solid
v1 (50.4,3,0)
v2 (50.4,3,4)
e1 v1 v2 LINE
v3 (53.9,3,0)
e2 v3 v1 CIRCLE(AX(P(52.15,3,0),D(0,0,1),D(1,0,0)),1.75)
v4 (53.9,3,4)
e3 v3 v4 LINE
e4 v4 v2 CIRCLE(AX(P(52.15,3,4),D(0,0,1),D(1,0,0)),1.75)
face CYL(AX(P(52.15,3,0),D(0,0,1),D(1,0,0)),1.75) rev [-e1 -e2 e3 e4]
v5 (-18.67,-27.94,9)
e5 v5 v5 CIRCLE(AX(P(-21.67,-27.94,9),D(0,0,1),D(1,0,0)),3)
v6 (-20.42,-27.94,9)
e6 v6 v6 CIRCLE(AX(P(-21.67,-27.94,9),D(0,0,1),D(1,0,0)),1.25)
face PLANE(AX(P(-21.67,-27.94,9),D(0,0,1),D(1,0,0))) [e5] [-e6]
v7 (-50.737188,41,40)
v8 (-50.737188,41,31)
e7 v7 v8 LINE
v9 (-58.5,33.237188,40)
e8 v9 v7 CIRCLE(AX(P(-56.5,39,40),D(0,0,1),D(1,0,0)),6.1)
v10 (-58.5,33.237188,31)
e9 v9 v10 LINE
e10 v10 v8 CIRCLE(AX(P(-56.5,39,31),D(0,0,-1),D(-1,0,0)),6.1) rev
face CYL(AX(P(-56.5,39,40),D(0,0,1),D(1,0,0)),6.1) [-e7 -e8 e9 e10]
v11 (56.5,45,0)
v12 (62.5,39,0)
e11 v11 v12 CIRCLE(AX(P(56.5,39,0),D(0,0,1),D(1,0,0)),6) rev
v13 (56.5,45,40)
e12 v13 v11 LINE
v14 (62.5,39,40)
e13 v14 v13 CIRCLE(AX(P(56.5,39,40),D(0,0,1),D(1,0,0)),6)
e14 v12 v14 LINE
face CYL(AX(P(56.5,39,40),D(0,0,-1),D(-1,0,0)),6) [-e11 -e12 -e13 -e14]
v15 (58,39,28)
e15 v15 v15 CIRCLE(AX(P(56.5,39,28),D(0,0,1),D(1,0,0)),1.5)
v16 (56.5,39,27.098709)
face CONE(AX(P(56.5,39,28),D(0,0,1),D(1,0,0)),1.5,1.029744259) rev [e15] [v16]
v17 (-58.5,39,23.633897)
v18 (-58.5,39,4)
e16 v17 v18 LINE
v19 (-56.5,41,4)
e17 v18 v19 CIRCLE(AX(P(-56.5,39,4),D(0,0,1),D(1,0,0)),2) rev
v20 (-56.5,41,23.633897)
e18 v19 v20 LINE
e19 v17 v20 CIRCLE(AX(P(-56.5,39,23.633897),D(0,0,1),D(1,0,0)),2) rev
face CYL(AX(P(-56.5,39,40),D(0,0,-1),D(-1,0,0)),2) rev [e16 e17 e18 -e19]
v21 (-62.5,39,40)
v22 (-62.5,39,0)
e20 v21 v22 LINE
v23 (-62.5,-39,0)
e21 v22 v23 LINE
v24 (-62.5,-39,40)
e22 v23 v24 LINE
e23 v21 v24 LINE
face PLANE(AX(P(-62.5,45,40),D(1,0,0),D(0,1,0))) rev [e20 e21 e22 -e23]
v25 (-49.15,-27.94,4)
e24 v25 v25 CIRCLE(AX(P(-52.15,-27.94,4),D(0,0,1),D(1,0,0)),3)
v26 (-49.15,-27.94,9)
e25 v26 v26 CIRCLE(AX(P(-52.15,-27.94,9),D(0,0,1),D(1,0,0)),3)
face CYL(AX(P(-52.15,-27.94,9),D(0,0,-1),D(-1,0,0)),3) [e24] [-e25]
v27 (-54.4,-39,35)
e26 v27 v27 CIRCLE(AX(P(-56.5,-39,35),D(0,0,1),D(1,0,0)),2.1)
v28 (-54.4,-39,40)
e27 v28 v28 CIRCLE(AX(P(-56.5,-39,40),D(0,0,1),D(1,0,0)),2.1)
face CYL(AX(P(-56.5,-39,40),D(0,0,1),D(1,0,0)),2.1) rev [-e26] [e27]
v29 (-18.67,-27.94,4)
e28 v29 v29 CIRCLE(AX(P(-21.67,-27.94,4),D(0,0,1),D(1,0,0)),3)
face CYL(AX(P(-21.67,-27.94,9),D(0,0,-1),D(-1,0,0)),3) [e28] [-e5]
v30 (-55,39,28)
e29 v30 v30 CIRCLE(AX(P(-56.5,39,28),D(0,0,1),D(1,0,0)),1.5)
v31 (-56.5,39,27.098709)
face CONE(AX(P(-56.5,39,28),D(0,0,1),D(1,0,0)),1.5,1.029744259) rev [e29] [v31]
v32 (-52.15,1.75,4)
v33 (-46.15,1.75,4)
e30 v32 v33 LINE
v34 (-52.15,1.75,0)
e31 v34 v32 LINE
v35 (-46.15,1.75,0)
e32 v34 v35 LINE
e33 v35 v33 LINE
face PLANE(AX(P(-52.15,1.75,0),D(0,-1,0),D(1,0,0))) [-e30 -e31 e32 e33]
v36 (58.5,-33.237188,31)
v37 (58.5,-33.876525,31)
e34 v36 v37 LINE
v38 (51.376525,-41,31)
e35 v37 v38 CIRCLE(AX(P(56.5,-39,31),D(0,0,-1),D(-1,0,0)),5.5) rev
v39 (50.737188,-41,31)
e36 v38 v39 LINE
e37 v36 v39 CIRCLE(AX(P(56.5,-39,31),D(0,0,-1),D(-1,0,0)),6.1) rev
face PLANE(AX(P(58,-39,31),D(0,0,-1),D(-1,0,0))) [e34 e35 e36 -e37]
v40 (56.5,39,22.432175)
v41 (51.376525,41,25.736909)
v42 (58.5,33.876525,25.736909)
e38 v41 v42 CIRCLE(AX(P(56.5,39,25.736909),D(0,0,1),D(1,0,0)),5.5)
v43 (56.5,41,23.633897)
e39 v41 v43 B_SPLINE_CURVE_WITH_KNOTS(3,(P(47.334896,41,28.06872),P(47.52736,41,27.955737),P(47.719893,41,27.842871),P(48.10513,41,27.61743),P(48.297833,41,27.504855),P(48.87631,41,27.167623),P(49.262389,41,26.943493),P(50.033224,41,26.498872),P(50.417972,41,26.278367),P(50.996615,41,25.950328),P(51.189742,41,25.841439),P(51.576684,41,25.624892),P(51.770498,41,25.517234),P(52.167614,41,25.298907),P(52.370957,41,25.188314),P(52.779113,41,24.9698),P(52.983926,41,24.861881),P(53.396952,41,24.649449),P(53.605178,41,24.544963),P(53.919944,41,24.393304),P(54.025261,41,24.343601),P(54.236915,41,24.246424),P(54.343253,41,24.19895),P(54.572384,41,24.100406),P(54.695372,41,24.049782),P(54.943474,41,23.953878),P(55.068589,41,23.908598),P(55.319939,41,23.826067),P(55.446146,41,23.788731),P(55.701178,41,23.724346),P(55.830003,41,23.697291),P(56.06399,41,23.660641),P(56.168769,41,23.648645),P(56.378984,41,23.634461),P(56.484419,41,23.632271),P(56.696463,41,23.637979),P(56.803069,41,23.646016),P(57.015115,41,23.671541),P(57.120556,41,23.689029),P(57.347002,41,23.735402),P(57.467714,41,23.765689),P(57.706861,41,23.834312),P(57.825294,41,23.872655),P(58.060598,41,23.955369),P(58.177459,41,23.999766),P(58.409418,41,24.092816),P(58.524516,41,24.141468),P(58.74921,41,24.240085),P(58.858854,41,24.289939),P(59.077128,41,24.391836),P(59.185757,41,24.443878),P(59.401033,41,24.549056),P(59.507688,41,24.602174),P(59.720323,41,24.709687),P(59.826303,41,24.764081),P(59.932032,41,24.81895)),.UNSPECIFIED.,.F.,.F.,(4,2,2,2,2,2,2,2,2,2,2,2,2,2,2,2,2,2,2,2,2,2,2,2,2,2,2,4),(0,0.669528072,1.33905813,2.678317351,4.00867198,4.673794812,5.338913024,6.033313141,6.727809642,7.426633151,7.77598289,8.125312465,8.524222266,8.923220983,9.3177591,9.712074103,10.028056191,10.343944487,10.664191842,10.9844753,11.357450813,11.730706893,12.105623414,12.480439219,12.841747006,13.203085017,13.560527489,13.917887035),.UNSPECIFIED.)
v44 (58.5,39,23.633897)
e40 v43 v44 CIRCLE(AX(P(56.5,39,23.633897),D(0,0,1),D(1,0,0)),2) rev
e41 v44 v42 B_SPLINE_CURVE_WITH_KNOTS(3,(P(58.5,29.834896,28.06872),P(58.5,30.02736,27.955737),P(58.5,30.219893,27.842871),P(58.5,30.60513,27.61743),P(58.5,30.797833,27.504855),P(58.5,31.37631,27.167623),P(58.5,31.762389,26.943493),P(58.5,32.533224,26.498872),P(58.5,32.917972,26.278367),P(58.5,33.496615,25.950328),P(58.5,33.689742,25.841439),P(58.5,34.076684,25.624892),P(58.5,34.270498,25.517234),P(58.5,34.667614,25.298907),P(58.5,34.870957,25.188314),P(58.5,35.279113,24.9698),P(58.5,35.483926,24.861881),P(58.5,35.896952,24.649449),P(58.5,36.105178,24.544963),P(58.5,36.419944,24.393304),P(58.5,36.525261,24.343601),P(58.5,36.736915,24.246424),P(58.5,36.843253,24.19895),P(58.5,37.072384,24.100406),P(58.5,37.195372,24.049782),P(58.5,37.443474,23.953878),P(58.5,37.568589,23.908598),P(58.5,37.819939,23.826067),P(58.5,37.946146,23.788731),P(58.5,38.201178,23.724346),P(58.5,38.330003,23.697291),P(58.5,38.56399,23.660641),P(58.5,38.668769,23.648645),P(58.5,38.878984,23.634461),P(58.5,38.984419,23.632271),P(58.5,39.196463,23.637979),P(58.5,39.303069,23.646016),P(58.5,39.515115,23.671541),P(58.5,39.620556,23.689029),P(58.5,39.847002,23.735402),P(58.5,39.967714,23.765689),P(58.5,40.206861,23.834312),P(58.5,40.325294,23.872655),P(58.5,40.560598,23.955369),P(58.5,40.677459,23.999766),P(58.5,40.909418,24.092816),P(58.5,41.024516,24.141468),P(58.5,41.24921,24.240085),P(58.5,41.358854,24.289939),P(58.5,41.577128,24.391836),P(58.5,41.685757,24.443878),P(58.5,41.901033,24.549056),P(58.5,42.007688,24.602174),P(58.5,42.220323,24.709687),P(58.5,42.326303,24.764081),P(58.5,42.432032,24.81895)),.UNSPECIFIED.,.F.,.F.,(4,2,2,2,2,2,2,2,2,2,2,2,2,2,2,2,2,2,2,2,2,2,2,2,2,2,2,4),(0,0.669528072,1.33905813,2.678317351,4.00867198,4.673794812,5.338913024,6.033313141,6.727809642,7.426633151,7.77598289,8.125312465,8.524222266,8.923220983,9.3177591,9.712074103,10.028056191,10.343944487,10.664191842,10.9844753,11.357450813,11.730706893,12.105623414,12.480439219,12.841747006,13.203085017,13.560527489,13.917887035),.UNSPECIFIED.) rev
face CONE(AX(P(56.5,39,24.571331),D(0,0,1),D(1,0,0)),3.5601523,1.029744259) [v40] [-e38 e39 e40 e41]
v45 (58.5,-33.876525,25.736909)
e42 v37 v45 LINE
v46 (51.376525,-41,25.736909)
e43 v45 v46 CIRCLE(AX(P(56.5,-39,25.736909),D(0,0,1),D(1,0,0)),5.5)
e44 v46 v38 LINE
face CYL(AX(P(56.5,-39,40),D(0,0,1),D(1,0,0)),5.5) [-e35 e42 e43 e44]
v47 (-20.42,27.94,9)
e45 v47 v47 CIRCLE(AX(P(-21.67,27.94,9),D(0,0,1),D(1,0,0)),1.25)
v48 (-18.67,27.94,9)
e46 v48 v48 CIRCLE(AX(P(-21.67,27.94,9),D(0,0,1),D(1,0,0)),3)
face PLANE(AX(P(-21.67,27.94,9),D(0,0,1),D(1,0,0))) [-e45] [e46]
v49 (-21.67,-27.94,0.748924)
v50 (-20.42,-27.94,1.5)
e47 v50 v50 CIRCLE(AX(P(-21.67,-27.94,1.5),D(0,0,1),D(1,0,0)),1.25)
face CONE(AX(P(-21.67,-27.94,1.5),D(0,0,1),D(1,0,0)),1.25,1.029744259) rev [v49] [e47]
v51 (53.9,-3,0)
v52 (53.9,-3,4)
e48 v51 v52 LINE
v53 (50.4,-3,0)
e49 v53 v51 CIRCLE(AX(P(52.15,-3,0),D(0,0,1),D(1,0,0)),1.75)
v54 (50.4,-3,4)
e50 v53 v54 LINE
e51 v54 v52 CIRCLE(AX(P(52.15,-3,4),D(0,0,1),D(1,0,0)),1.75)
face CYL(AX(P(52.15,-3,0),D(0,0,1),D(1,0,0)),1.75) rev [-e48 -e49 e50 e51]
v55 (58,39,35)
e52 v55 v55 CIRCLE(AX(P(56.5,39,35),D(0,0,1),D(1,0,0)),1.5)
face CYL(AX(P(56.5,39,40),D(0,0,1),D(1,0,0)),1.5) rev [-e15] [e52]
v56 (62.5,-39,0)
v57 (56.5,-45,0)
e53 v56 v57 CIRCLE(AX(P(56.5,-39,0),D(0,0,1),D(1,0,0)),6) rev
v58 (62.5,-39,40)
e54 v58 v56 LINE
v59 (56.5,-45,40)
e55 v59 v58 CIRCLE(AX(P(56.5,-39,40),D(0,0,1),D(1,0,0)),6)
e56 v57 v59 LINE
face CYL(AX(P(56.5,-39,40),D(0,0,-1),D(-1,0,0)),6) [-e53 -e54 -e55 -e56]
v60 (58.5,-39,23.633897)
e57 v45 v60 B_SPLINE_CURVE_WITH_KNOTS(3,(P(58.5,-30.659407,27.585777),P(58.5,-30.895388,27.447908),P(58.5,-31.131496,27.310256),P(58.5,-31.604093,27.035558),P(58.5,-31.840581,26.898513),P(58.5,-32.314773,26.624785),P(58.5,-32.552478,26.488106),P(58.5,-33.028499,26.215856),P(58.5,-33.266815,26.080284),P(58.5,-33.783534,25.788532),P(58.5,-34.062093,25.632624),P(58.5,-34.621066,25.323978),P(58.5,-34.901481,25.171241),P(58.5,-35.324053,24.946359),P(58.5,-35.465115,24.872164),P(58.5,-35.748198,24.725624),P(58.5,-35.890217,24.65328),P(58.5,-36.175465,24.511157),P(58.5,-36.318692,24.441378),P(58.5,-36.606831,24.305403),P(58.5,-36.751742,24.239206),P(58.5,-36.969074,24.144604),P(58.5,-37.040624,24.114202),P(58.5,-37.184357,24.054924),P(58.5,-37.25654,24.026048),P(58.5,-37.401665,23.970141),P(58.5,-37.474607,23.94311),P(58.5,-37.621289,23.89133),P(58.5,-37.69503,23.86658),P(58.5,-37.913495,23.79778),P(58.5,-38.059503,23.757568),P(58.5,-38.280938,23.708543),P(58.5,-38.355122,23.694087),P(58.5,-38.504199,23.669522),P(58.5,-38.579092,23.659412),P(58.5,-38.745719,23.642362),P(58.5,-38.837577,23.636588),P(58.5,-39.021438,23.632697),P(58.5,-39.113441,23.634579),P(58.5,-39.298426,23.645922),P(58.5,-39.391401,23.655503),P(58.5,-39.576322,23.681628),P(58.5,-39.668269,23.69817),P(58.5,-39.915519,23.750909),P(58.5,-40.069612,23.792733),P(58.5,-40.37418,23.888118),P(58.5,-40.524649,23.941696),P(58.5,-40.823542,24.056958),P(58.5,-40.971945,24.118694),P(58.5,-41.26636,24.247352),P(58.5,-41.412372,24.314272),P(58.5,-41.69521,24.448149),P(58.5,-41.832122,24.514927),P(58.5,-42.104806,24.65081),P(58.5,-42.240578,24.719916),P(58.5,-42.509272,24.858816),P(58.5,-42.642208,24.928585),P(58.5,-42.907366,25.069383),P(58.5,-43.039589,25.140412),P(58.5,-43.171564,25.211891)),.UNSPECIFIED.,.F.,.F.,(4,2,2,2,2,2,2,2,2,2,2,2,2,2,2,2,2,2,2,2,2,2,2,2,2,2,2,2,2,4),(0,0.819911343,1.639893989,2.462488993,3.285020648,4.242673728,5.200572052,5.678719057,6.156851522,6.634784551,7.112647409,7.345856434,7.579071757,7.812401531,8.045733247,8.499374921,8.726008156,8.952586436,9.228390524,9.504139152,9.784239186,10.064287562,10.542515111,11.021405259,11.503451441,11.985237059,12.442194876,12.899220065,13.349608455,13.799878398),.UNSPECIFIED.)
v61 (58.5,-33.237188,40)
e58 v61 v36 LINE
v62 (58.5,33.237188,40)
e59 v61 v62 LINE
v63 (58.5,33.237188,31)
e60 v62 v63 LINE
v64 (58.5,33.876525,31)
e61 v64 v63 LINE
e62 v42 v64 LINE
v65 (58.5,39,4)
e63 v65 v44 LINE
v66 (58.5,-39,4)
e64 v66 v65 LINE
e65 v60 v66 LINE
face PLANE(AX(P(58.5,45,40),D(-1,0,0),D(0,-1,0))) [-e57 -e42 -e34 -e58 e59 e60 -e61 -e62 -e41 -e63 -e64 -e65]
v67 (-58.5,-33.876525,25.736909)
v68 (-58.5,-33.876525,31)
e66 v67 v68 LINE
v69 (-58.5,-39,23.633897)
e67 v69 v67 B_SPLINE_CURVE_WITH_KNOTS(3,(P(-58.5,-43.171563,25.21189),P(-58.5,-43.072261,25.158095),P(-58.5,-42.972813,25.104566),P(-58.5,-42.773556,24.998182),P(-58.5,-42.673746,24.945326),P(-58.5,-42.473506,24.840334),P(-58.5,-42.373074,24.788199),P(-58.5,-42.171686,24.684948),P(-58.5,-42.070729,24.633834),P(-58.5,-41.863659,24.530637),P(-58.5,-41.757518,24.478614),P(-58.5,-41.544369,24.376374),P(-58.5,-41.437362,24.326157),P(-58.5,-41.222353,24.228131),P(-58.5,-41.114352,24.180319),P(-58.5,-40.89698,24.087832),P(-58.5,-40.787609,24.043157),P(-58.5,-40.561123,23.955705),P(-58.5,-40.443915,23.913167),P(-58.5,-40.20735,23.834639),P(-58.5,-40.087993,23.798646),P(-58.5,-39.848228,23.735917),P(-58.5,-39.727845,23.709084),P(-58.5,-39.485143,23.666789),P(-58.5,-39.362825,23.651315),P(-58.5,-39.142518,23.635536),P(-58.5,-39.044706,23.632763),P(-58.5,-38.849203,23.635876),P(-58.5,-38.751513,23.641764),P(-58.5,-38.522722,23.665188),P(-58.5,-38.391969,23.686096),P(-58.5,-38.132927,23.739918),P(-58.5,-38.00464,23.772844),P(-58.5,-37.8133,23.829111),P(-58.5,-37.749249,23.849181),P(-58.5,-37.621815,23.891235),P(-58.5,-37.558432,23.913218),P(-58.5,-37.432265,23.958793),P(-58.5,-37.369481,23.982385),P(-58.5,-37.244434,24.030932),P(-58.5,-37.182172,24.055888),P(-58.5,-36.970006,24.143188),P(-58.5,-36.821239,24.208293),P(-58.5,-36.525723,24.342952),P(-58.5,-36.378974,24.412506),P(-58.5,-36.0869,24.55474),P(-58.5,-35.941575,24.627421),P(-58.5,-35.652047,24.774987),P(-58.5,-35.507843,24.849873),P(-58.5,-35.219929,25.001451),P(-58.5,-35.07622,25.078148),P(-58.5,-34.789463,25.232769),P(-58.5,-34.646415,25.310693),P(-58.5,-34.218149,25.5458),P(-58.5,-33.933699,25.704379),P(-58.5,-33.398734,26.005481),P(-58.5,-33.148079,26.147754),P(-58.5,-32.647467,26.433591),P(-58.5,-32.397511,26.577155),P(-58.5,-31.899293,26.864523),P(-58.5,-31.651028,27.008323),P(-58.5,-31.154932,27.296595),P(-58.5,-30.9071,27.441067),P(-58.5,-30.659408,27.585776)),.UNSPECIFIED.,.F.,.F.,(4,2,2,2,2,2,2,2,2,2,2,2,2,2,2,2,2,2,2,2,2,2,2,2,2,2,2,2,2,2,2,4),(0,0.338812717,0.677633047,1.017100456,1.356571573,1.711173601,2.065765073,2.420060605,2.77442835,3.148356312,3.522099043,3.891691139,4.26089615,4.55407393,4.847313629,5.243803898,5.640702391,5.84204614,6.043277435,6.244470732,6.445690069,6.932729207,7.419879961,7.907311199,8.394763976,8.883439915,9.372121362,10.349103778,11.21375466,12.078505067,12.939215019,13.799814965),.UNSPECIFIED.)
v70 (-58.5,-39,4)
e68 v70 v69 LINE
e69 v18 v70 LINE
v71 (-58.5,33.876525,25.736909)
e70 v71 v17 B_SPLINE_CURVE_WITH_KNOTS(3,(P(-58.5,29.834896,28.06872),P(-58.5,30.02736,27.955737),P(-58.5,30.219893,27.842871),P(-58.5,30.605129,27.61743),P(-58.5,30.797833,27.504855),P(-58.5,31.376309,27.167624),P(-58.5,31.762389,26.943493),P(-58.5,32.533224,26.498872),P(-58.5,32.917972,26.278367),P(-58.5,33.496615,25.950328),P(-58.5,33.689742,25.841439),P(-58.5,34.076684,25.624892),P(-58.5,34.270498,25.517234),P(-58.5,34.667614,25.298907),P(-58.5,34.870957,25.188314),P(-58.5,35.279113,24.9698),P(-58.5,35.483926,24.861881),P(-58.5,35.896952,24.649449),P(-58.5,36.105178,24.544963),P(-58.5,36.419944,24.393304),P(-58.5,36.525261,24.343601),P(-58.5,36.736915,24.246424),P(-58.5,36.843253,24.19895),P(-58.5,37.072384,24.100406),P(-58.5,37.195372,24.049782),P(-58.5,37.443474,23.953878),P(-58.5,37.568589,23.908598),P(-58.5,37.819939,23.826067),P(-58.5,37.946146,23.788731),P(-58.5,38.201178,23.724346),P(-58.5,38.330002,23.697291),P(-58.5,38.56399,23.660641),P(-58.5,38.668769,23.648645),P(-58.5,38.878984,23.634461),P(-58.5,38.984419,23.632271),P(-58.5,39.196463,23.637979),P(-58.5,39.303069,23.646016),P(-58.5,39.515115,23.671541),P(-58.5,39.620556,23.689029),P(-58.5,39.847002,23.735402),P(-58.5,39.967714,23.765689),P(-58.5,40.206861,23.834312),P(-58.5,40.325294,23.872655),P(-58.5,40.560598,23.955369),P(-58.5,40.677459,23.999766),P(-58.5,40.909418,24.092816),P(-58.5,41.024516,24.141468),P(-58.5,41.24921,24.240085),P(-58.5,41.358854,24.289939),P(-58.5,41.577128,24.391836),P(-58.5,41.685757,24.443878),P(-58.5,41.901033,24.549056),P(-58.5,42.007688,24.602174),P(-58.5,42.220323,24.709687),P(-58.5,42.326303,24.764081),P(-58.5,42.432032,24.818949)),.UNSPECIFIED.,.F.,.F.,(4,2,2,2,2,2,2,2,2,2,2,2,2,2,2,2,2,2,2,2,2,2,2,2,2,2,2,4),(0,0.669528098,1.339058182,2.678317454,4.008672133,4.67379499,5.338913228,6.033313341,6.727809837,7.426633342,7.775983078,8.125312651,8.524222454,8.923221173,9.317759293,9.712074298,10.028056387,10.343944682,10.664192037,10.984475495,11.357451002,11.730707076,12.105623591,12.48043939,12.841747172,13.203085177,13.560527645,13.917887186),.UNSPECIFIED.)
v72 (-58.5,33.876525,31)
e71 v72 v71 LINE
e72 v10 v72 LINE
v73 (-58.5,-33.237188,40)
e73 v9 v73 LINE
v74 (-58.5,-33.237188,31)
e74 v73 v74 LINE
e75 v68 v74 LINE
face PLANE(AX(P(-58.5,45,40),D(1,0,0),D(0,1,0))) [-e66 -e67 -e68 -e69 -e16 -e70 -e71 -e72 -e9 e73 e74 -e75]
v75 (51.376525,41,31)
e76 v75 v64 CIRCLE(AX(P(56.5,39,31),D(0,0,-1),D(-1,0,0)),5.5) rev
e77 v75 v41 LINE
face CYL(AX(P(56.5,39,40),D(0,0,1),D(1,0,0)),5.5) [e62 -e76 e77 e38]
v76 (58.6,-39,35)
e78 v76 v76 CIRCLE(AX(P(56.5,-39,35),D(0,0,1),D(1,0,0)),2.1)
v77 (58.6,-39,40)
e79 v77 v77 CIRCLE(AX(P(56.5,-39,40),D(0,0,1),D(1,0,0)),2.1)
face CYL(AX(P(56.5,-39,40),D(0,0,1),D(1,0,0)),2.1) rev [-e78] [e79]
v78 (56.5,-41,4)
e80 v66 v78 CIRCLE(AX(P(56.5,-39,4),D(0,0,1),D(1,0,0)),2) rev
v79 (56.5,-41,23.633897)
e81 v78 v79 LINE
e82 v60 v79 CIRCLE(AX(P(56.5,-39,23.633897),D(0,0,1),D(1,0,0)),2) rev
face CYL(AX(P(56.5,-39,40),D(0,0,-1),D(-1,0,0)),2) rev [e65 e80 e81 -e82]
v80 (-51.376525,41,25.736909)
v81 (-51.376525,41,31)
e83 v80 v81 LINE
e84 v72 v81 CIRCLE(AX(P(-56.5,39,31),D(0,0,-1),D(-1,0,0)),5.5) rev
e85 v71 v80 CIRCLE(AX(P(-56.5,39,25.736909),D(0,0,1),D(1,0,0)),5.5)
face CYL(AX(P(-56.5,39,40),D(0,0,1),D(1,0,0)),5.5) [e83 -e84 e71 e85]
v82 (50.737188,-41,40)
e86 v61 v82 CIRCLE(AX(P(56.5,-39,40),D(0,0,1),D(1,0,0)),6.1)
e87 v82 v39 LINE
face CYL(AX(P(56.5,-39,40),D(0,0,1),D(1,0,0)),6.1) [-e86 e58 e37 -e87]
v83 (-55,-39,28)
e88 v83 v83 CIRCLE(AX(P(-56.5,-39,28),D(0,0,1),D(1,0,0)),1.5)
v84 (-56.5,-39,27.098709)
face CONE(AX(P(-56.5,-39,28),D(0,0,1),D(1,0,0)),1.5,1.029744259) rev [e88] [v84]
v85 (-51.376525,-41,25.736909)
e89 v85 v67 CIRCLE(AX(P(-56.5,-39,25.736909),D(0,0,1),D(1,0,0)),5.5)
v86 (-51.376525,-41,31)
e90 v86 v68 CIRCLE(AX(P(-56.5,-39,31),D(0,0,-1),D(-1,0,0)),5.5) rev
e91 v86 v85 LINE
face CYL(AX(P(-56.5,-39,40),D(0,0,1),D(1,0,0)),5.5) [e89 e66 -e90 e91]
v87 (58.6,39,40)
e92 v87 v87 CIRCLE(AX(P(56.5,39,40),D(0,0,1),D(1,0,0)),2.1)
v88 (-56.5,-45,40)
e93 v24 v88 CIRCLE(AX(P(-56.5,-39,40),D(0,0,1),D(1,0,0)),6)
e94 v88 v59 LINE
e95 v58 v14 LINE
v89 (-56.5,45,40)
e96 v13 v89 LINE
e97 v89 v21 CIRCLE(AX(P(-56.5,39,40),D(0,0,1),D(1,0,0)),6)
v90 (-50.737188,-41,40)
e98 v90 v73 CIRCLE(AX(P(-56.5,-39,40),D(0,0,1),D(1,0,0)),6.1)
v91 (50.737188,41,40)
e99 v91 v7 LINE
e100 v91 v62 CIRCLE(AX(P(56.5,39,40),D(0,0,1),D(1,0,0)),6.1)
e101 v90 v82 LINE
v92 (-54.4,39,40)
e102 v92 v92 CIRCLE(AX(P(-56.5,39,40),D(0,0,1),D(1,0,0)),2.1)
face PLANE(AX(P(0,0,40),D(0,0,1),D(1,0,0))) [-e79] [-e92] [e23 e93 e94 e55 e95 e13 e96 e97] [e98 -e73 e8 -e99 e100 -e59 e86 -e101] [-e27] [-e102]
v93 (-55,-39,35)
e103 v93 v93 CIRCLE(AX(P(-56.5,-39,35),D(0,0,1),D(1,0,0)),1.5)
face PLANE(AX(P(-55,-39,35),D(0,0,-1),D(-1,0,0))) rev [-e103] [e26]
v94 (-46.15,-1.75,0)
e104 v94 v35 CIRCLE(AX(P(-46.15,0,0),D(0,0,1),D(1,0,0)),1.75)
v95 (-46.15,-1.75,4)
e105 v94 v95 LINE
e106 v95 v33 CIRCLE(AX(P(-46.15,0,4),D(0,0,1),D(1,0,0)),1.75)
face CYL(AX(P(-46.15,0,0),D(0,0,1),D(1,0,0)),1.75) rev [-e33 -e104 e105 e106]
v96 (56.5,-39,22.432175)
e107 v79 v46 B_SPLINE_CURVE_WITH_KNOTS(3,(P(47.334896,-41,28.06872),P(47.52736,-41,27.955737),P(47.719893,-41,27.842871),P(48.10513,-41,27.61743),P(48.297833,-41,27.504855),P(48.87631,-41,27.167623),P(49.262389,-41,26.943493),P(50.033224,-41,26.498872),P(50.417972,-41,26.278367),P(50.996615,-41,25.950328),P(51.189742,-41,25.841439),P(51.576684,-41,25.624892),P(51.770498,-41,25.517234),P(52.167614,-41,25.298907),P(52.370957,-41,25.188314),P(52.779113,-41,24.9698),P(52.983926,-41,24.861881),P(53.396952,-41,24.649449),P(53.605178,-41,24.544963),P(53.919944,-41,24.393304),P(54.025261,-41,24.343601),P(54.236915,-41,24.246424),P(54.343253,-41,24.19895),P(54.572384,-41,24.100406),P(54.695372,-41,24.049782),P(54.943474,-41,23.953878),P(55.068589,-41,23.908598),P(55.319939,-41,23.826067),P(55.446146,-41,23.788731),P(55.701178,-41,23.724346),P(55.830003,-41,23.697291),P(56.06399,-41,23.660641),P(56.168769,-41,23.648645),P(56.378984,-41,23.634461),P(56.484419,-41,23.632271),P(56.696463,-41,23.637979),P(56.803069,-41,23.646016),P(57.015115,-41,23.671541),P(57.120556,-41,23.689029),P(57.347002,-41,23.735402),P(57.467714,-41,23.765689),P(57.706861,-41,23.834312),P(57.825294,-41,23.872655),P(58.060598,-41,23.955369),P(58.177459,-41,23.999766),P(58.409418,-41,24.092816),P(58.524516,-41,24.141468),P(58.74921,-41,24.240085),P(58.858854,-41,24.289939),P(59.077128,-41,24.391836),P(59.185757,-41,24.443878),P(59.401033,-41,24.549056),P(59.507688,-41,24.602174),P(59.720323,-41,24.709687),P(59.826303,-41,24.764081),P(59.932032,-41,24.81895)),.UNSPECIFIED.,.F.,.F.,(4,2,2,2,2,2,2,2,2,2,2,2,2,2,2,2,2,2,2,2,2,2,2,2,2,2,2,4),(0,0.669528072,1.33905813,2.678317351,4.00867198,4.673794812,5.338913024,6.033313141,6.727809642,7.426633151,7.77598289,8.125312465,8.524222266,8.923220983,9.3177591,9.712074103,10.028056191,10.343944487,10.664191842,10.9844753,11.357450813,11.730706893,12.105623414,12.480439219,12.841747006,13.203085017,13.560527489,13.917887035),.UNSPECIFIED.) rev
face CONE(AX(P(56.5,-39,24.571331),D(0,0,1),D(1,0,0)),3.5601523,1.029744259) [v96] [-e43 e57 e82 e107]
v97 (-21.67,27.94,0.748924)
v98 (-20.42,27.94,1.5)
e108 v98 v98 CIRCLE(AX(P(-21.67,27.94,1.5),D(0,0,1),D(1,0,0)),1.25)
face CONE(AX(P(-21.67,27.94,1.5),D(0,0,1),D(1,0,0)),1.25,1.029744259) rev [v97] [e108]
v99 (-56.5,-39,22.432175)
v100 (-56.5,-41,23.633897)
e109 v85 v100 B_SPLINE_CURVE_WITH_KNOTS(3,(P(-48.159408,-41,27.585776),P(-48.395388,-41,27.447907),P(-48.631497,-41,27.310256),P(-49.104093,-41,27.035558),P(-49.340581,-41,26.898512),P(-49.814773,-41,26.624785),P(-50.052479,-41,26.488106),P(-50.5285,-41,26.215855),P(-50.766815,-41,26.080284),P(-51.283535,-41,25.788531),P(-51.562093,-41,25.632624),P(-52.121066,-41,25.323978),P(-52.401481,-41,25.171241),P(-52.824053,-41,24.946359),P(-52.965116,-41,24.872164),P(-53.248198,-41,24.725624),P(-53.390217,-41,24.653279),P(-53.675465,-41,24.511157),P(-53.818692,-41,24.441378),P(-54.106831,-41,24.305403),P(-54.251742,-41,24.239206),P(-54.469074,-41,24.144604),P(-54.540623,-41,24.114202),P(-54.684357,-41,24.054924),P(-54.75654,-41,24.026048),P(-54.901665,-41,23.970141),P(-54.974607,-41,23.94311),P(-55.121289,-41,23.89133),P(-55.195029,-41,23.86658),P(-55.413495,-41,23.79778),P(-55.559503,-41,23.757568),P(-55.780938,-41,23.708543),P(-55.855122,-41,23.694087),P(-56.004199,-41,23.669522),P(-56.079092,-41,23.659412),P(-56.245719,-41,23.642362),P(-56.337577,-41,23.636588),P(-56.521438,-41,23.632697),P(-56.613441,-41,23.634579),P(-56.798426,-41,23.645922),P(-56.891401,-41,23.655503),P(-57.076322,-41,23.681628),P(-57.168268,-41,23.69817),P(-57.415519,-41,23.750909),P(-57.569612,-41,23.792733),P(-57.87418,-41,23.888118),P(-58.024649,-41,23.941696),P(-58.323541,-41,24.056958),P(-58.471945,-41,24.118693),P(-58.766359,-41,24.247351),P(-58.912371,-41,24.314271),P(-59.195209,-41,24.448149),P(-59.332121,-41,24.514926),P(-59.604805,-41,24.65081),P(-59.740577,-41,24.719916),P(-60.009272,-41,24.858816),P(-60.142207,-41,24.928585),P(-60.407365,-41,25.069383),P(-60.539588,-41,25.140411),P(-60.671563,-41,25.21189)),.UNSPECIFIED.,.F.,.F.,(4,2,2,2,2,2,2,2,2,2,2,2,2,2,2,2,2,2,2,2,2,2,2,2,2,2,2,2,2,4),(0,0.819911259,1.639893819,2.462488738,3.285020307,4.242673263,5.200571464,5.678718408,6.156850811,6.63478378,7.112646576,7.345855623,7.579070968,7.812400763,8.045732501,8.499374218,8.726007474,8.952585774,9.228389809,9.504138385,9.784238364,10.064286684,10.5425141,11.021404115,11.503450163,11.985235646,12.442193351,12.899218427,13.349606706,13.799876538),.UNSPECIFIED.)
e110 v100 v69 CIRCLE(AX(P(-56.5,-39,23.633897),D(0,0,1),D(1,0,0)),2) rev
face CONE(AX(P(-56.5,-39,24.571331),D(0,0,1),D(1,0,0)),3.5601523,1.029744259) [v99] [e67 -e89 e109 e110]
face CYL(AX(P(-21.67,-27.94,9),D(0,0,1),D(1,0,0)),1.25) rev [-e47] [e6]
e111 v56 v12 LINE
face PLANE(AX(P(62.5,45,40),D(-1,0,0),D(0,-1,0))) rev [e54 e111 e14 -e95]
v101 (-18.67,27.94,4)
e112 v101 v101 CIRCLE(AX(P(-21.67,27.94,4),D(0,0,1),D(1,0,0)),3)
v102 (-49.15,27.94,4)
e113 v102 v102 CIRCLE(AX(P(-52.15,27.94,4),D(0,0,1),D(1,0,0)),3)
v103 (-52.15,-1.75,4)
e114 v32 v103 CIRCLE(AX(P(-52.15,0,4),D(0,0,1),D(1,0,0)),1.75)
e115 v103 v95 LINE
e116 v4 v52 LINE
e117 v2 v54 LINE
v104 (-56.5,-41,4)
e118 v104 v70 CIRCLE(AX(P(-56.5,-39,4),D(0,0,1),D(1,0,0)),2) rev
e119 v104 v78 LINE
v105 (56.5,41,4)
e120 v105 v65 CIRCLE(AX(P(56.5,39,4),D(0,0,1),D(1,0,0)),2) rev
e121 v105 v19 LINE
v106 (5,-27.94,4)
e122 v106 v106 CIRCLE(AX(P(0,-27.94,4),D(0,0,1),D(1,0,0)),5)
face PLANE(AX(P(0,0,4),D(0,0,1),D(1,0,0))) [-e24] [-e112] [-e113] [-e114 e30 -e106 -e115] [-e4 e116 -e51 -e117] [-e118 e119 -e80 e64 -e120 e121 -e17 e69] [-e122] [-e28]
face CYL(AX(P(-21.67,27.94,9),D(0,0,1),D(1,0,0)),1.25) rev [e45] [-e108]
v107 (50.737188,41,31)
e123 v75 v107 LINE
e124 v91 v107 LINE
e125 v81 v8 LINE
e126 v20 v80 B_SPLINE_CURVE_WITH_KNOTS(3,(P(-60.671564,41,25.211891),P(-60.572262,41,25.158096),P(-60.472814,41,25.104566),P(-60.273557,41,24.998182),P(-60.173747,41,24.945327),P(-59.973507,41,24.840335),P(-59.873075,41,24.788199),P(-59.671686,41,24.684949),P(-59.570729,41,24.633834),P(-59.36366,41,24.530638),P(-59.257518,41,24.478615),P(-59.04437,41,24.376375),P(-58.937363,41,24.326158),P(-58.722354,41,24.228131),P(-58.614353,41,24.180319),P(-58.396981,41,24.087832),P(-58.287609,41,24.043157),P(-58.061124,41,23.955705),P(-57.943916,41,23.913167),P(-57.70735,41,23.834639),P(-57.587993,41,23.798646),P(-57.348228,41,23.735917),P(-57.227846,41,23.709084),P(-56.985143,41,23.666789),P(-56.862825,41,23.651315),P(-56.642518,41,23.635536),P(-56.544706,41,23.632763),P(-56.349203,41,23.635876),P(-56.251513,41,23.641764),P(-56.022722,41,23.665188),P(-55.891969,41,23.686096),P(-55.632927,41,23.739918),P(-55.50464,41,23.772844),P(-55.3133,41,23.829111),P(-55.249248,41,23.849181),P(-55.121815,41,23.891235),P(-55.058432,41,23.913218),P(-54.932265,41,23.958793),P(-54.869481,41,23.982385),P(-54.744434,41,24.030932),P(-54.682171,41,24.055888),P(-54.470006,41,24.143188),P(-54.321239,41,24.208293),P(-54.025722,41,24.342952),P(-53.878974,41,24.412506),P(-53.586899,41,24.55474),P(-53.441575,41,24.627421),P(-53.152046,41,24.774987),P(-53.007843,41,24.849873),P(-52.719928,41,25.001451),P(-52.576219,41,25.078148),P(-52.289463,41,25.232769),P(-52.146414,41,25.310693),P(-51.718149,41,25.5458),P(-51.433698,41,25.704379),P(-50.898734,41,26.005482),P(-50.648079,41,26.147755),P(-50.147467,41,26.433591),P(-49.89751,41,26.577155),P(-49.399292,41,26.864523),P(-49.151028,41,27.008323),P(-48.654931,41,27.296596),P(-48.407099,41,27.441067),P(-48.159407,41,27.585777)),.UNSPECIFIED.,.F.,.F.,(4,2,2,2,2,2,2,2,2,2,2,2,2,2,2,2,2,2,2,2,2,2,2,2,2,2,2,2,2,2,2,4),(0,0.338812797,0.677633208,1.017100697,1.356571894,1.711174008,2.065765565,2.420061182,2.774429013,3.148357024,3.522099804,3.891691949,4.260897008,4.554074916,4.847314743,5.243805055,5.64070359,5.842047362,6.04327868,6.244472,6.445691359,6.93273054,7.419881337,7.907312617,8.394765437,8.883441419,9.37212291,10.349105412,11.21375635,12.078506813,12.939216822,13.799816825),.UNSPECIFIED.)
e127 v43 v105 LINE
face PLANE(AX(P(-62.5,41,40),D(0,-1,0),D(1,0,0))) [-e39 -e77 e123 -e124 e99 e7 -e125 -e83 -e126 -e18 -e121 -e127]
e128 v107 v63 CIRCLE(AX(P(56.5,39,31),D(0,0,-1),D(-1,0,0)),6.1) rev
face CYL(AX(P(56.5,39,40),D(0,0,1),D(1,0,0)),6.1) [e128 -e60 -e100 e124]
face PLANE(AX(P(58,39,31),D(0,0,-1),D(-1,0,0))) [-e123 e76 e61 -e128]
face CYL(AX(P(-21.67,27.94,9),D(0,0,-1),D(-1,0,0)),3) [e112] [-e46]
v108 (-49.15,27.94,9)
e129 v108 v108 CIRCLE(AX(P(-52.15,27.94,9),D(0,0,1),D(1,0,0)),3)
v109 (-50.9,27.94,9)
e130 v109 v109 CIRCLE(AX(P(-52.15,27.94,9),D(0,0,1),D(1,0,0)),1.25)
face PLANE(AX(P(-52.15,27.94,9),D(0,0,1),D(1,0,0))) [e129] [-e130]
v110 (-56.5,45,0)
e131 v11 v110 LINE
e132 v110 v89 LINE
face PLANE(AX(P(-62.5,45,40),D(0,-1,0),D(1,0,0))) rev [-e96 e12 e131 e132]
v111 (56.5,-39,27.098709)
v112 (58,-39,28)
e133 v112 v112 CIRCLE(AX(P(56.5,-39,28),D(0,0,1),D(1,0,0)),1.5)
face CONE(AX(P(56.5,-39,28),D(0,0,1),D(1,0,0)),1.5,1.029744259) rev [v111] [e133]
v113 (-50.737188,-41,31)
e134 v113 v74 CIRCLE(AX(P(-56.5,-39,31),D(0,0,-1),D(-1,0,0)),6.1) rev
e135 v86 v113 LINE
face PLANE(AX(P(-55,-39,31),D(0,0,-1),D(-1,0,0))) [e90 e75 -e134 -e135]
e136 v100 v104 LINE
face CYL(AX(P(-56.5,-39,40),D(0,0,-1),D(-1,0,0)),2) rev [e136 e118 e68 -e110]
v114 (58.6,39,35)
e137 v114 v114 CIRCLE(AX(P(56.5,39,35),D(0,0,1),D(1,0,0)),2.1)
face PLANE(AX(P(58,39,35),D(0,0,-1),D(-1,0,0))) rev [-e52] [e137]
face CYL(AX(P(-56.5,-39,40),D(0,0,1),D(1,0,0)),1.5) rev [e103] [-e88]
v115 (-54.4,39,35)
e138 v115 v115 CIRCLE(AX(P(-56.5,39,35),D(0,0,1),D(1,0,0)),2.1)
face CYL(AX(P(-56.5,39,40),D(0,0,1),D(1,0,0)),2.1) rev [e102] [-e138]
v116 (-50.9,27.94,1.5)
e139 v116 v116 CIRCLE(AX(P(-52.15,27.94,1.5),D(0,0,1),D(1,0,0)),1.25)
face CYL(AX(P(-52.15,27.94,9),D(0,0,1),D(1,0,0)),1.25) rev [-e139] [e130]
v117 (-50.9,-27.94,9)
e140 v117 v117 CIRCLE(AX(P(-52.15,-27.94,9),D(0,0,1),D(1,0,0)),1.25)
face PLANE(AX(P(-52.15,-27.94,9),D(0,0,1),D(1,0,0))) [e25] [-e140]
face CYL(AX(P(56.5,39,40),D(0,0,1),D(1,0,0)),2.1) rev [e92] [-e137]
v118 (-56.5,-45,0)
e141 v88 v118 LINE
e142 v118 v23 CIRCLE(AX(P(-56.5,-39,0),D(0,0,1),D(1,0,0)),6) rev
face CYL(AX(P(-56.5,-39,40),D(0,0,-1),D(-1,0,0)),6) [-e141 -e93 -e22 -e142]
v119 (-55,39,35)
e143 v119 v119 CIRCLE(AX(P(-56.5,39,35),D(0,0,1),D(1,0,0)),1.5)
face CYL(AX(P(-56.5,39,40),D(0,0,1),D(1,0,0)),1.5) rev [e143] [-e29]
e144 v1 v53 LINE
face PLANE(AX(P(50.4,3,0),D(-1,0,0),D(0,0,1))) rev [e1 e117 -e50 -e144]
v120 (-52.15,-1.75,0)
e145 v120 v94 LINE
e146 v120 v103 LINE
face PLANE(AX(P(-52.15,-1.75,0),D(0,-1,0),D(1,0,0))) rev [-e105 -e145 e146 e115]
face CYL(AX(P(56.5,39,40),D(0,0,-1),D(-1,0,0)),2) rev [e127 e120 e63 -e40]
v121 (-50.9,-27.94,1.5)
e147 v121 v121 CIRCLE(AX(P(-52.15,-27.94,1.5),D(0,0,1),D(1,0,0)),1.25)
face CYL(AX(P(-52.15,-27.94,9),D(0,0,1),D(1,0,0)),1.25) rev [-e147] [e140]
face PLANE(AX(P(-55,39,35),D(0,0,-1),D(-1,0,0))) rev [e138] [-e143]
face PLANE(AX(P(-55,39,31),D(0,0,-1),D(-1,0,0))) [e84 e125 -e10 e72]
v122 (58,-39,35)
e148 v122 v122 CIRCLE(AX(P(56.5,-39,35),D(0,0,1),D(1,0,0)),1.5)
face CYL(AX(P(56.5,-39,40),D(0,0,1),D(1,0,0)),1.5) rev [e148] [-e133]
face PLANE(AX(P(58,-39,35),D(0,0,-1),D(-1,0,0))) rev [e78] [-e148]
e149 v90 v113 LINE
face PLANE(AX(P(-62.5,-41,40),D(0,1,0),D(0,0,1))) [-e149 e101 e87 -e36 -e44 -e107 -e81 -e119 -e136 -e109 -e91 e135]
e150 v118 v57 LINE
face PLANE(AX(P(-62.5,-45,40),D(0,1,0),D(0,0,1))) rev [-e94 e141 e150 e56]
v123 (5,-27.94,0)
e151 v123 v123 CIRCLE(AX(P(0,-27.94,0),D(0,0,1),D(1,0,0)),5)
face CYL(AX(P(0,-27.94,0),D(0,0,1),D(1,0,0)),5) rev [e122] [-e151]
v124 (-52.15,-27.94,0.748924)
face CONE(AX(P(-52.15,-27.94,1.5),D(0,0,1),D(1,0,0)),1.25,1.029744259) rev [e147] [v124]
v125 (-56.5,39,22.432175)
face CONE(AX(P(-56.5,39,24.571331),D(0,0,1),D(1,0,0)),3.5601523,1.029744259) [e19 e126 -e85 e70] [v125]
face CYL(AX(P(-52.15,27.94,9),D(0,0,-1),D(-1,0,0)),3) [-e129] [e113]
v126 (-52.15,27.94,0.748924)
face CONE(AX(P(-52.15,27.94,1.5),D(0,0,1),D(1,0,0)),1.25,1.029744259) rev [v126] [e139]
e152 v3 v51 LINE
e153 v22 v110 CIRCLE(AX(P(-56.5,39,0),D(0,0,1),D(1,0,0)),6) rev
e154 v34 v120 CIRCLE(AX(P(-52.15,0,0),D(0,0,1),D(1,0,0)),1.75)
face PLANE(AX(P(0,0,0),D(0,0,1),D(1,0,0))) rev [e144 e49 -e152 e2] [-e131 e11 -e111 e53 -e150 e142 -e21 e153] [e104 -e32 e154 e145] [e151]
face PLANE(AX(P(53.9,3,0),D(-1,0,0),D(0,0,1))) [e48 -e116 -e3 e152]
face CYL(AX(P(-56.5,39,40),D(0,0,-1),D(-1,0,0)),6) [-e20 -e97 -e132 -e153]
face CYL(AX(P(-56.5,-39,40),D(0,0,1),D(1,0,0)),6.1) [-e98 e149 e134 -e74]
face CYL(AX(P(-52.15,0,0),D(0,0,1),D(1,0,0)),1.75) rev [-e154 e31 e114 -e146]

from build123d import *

# Parameters (mm, degrees)
SKETCH1_W                               = 125
SKETCH1_H                               = 90
BOSS_EXTRUDE1_DEPTH                     = 40
FILLET1_R                               = 6
CBORE_FOR_M5_HEX_HEAD_BOLT1_D           = 3
CBORE_FOR_M5_HEX_HEAD_BOLT1_DEPTH       = 12
CBORE_FOR_M5_HEX_HEAD_BOLT1_CBORE_D     = 4.2
CBORE_FOR_M5_HEX_HEAD_BOLT1_CBORE_DEPTH = 5
CBORE_FOR_M5_HEX_HEAD_BOLT1_TIP         = 0.901290929
SHELL2_START                            = 4
SHELL2_DEPTH                            = 36
SHELL2_2_DEPTH                          = 21.736908887
SHELL2_START_2                          = 23.633896721
SHELL2_3_DEPTH                          = 7.366103279
SKETCH7_R                               = 3
BOSS_EXTRUDE2_DEPTH                     = 5
M3X0_5_TAPPED_HOLE1_D                   = 2.5
M3X0_5_TAPPED_HOLE1_DEPTH               = 7.5
M3X0_5_TAPPED_HOLE1_TIP                 = 0.751075774
CUT_EXTRUDE1_DEPTH                      = 86.013234264
SKETCH7_5_R                             = 5
CUT_EXTRUDE2_DEPTH                      = 86.013234264
CUT_EXTRUDE3_DEPTH                      = 86.013234264


with BuildPart() as part:
    # Sketch1 → Boss-Extrude1 (new body)
    with BuildSketch(Plane.XY):
        Rectangle(SKETCH1_W, SKETCH1_H)
    extrude(amount=BOSS_EXTRUDE1_DEPTH)

    # Fillet1
    fillet1_edges = [part.edges().sort_by_distance(p)[0] for p in [
        (62.5, -45, 20),
        (-62.5, -45, 20),
        (-62.5, 45, 20),
        (62.5, 45, 20),
    ]]
    fillet(fillet1_edges, radius=FILLET1_R)

    # CBORE for M5 Hex Head Bolt1
    with Locations(Plane.XY.offset(40)):
        with Locations((-56.5, 39), (56.5, 39), (56.5, -39), (-56.5, -39)):
            CounterBoreHole(CBORE_FOR_M5_HEX_HEAD_BOLT1_D / 2, CBORE_FOR_M5_HEX_HEAD_BOLT1_CBORE_D / 2, CBORE_FOR_M5_HEX_HEAD_BOLT1_CBORE_DEPTH, depth=CBORE_FOR_M5_HEX_HEAD_BOLT1_DEPTH)
            with Locations((0, 0, -(CBORE_FOR_M5_HEX_HEAD_BOLT1_DEPTH + CBORE_FOR_M5_HEX_HEAD_BOLT1_TIP / 2))):  # 118° drill point
                Cone(0, CBORE_FOR_M5_HEX_HEAD_BOLT1_D / 2, CBORE_FOR_M5_HEX_HEAD_BOLT1_TIP, mode=Mode.SUBTRACT)

    # Shell2: read off the stored shape, not the designer's step
    # Shell2 outline → Shell2 (cut)
    with BuildSketch(Plane.XY.offset(SHELL2_START)):
        with BuildLine():
            ThreePointArc((58.5, 33.237188186), (52.186648635, 34.686648635), (50.737188186, 41))
            Line((50.737188186, 41), (-50.737188186, 41))
            ThreePointArc((-50.737188186, 41), (-52.186648635, 34.686648635), (-58.5, 33.237188186))
            Line((-58.5, 33.237188186), (-58.5, -33.237188186))
            ThreePointArc((-58.5, -33.237188186), (-52.186648635, -34.686648635), (-50.737188186, -41))
            Line((-50.737188186, -41), (50.737188186, -41))
            ThreePointArc((50.737188186, -41), (52.186648635, -34.686648635), (58.5, -33.237188186))
            Line((58.5, -33.237188186), (58.5, 33.237188186))
        make_face()
    extrude(amount=SHELL2_DEPTH, mode=Mode.SUBTRACT)

    # Shell2 2 outline → Shell2 2 (cut)
    with BuildSketch(Plane.XY.offset(SHELL2_START)):
        with BuildLine():
            Line((56.5, 41), (50.737188186, 41))
            ThreePointArc((50.737188186, 41), (52.186648635, 34.686648635), (58.5, 33.237188186))
            Line((58.5, 33.237188186), (58.5, 39))
            ThreePointArc((58.5, 39), (57.914213562, 40.414213562), (56.5, 41))
        make_face()
        with BuildLine():
            ThreePointArc((-58.5, 33.237188186), (-52.186648635, 34.686648635), (-50.737188186, 41))
            Line((-50.737188186, 41), (-56.5, 41))
            ThreePointArc((-56.5, 41), (-57.914213562, 40.414213562), (-58.5, 39))
            Line((-58.5, 39), (-58.5, 33.237188186))
        make_face()
        with BuildLine():
            ThreePointArc((58.5, -33.237188186), (52.186648635, -34.686648635), (50.737188186, -41))
            Line((50.737188186, -41), (56.5, -41))
            ThreePointArc((56.5, -41), (57.914213562, -40.414213562), (58.5, -39))
            Line((58.5, -39), (58.5, -33.237188186))
        make_face()
        with BuildLine():
            ThreePointArc((-50.737188186, -41), (-52.186648635, -34.686648635), (-58.5, -33.237188186))
            Line((-58.5, -33.237188186), (-58.5, -39))
            ThreePointArc((-58.5, -39), (-57.914213562, -40.414213562), (-56.5, -41))
            Line((-56.5, -41), (-50.737188186, -41))
        make_face()
    extrude(amount=SHELL2_2_DEPTH, mode=Mode.SUBTRACT)

    # Shell2 3 outline → Shell2 3 (cut)
    with BuildSketch(Plane.XY.offset(SHELL2_START_2)):
        with BuildLine():
            ThreePointArc((58.5, 33.876524617), (52.610912703, 35.110912703), (51.376524617, 41))
            Line((51.376524617, 41), (50.737188186, 41))
            ThreePointArc((50.737188186, 41), (52.186648635, 34.686648635), (58.5, 33.237188186))
            Line((58.5, 33.237188186), (58.5, 33.876524617))
        make_face()
        with BuildLine():
            ThreePointArc((-58.5, 33.237188186), (-52.186648635, 34.686648635), (-50.737188186, 41))
            Line((-50.737188186, 41), (-51.376524617, 41))
            ThreePointArc((-51.376524617, 41), (-52.610912703, 35.110912703), (-58.5, 33.876524617))
            Line((-58.5, 33.876524617), (-58.5, 33.237188186))
        make_face()
        with BuildLine():
            Line((58.5, -33.876524617), (58.5, -33.237188186))
            ThreePointArc((58.5, -33.237188186), (52.186648635, -34.686648635), (50.737188186, -41))
            Line((50.737188186, -41), (51.376524617, -41))
            ThreePointArc((51.376524617, -41), (52.610912703, -35.110912703), (58.5, -33.876524617))
        make_face()
        with BuildLine():
            ThreePointArc((-50.737188186, -41), (-52.186648635, -34.686648635), (-58.5, -33.237188186))
            Line((-58.5, -33.237188186), (-58.5, -33.876524617))
            ThreePointArc((-58.5, -33.876524617), (-52.610912703, -35.110912703), (-51.376524617, -41))
            Line((-51.376524617, -41), (-50.737188186, -41))
        make_face()
    extrude(amount=SHELL2_3_DEPTH, mode=Mode.SUBTRACT)

    # Shell2 4 outline → Shell2 4 (revolve)
    with BuildSketch(Plane(origin=(56.5, 39, 0), x_dir=(1, 0, 0), z_dir=(0, -1, 0))):
        Polygon((0, 25.736908889), (0, 22.432175483), (5.500000002, 25.736908889), align=None)
    revolve(axis=Axis((56.5, 39, 0), (0, 0, 1)))

    # Shell2 5 outline → Shell2 5 (revolve)
    with BuildSketch(Plane(origin=(56.5, -39, 0), x_dir=(1, 0, 0), z_dir=(0, -1, 0))):
        Polygon((0, 25.736908889), (0, 22.432175483), (5.500000002, 25.736908889), align=None)
    revolve(axis=Axis((56.5, -39, 0), (0, 0, 1)))

    # Shell2 6 outline → Shell2 6 (revolve)
    with BuildSketch(Plane(origin=(-56.5, 39, 0), x_dir=(1, 0, 0), z_dir=(0, -1, 0))):
        Polygon((0, 25.736908889), (0, 22.432175483), (5.500000002, 25.736908889), align=None)
    revolve(axis=Axis((-56.5, 39, 0), (0, 0, 1)))

    # Shell2 7 outline → Shell2 7 (revolve)
    with BuildSketch(Plane(origin=(-56.5, -39, 0), x_dir=(1, 0, 0), z_dir=(0, -1, 0))):
        Polygon((0, 25.736908887), (0, 22.432175483), (5.5, 25.736908887), align=None)
    revolve(axis=Axis((-56.5, -39, 0), (0, 0, 1)))

    # Sketch7 → Boss-Extrude2 (add)
    with BuildSketch(Plane.XY.offset(4)):
        with Locations((-52.15, 27.94)):
            Circle(SKETCH7_R)
        with Locations((-21.67, 27.94)):
            Circle(SKETCH7_R)
        with Locations((-52.15, -27.94)):
            Circle(SKETCH7_R)
        with Locations((-21.67, -27.94)):
            Circle(SKETCH7_R)
    extrude(amount=BOSS_EXTRUDE2_DEPTH)

    # M3x0.5 Tapped Hole1
    with Locations(Plane.XY.offset(9)):
        with Locations((-52.15, 27.94), (-21.67, 27.94), (-21.67, -27.94), (-52.15, -27.94)):
            Hole(M3X0_5_TAPPED_HOLE1_D / 2, depth=M3X0_5_TAPPED_HOLE1_DEPTH)
            with Locations((0, 0, -(M3X0_5_TAPPED_HOLE1_DEPTH + M3X0_5_TAPPED_HOLE1_TIP / 2))):  # 118° drill point
                Cone(0, M3X0_5_TAPPED_HOLE1_D / 2, M3X0_5_TAPPED_HOLE1_TIP, mode=Mode.SUBTRACT)

    # Sketch7<4> → Cut-Extrude1 (cut, through all)
    with BuildSketch(Plane.XY.offset(4)):
        with BuildLine():
            Line((-52.15, 1.75), (-46.15, 1.75))
            ThreePointArc((-46.15, 1.75), (-44.4, 0), (-46.15, -1.75))
            Line((-46.15, -1.75), (-52.15, -1.75))
            ThreePointArc((-52.15, -1.75), (-53.9, 0), (-52.15, 1.75))
        make_face()
    extrude(amount=-CUT_EXTRUDE1_DEPTH, mode=Mode.SUBTRACT)

    # Sketch7<5> → Cut-Extrude2 (cut, through all)
    with BuildSketch(Plane.XY.offset(4)):
        with Locations((0, -27.94)):
            Circle(SKETCH7_5_R)
    extrude(amount=-CUT_EXTRUDE2_DEPTH, mode=Mode.SUBTRACT)

    # Sketch7<6> → Cut-Extrude3 (cut, through all)
    with BuildSketch(Plane.XY.offset(4)):
        with BuildLine():
            Line((53.9, 3), (53.9, -3))
            ThreePointArc((53.9, -3), (52.15, -4.75), (50.4, -3))
            Line((50.4, -3), (50.4, 3))
            ThreePointArc((50.4, 3), (52.15, 4.75), (53.9, 3))
        make_face()
    extrude(amount=-CUT_EXTRUDE3_DEPTH, mode=Mode.SUBTRACT)


solid = part.part
